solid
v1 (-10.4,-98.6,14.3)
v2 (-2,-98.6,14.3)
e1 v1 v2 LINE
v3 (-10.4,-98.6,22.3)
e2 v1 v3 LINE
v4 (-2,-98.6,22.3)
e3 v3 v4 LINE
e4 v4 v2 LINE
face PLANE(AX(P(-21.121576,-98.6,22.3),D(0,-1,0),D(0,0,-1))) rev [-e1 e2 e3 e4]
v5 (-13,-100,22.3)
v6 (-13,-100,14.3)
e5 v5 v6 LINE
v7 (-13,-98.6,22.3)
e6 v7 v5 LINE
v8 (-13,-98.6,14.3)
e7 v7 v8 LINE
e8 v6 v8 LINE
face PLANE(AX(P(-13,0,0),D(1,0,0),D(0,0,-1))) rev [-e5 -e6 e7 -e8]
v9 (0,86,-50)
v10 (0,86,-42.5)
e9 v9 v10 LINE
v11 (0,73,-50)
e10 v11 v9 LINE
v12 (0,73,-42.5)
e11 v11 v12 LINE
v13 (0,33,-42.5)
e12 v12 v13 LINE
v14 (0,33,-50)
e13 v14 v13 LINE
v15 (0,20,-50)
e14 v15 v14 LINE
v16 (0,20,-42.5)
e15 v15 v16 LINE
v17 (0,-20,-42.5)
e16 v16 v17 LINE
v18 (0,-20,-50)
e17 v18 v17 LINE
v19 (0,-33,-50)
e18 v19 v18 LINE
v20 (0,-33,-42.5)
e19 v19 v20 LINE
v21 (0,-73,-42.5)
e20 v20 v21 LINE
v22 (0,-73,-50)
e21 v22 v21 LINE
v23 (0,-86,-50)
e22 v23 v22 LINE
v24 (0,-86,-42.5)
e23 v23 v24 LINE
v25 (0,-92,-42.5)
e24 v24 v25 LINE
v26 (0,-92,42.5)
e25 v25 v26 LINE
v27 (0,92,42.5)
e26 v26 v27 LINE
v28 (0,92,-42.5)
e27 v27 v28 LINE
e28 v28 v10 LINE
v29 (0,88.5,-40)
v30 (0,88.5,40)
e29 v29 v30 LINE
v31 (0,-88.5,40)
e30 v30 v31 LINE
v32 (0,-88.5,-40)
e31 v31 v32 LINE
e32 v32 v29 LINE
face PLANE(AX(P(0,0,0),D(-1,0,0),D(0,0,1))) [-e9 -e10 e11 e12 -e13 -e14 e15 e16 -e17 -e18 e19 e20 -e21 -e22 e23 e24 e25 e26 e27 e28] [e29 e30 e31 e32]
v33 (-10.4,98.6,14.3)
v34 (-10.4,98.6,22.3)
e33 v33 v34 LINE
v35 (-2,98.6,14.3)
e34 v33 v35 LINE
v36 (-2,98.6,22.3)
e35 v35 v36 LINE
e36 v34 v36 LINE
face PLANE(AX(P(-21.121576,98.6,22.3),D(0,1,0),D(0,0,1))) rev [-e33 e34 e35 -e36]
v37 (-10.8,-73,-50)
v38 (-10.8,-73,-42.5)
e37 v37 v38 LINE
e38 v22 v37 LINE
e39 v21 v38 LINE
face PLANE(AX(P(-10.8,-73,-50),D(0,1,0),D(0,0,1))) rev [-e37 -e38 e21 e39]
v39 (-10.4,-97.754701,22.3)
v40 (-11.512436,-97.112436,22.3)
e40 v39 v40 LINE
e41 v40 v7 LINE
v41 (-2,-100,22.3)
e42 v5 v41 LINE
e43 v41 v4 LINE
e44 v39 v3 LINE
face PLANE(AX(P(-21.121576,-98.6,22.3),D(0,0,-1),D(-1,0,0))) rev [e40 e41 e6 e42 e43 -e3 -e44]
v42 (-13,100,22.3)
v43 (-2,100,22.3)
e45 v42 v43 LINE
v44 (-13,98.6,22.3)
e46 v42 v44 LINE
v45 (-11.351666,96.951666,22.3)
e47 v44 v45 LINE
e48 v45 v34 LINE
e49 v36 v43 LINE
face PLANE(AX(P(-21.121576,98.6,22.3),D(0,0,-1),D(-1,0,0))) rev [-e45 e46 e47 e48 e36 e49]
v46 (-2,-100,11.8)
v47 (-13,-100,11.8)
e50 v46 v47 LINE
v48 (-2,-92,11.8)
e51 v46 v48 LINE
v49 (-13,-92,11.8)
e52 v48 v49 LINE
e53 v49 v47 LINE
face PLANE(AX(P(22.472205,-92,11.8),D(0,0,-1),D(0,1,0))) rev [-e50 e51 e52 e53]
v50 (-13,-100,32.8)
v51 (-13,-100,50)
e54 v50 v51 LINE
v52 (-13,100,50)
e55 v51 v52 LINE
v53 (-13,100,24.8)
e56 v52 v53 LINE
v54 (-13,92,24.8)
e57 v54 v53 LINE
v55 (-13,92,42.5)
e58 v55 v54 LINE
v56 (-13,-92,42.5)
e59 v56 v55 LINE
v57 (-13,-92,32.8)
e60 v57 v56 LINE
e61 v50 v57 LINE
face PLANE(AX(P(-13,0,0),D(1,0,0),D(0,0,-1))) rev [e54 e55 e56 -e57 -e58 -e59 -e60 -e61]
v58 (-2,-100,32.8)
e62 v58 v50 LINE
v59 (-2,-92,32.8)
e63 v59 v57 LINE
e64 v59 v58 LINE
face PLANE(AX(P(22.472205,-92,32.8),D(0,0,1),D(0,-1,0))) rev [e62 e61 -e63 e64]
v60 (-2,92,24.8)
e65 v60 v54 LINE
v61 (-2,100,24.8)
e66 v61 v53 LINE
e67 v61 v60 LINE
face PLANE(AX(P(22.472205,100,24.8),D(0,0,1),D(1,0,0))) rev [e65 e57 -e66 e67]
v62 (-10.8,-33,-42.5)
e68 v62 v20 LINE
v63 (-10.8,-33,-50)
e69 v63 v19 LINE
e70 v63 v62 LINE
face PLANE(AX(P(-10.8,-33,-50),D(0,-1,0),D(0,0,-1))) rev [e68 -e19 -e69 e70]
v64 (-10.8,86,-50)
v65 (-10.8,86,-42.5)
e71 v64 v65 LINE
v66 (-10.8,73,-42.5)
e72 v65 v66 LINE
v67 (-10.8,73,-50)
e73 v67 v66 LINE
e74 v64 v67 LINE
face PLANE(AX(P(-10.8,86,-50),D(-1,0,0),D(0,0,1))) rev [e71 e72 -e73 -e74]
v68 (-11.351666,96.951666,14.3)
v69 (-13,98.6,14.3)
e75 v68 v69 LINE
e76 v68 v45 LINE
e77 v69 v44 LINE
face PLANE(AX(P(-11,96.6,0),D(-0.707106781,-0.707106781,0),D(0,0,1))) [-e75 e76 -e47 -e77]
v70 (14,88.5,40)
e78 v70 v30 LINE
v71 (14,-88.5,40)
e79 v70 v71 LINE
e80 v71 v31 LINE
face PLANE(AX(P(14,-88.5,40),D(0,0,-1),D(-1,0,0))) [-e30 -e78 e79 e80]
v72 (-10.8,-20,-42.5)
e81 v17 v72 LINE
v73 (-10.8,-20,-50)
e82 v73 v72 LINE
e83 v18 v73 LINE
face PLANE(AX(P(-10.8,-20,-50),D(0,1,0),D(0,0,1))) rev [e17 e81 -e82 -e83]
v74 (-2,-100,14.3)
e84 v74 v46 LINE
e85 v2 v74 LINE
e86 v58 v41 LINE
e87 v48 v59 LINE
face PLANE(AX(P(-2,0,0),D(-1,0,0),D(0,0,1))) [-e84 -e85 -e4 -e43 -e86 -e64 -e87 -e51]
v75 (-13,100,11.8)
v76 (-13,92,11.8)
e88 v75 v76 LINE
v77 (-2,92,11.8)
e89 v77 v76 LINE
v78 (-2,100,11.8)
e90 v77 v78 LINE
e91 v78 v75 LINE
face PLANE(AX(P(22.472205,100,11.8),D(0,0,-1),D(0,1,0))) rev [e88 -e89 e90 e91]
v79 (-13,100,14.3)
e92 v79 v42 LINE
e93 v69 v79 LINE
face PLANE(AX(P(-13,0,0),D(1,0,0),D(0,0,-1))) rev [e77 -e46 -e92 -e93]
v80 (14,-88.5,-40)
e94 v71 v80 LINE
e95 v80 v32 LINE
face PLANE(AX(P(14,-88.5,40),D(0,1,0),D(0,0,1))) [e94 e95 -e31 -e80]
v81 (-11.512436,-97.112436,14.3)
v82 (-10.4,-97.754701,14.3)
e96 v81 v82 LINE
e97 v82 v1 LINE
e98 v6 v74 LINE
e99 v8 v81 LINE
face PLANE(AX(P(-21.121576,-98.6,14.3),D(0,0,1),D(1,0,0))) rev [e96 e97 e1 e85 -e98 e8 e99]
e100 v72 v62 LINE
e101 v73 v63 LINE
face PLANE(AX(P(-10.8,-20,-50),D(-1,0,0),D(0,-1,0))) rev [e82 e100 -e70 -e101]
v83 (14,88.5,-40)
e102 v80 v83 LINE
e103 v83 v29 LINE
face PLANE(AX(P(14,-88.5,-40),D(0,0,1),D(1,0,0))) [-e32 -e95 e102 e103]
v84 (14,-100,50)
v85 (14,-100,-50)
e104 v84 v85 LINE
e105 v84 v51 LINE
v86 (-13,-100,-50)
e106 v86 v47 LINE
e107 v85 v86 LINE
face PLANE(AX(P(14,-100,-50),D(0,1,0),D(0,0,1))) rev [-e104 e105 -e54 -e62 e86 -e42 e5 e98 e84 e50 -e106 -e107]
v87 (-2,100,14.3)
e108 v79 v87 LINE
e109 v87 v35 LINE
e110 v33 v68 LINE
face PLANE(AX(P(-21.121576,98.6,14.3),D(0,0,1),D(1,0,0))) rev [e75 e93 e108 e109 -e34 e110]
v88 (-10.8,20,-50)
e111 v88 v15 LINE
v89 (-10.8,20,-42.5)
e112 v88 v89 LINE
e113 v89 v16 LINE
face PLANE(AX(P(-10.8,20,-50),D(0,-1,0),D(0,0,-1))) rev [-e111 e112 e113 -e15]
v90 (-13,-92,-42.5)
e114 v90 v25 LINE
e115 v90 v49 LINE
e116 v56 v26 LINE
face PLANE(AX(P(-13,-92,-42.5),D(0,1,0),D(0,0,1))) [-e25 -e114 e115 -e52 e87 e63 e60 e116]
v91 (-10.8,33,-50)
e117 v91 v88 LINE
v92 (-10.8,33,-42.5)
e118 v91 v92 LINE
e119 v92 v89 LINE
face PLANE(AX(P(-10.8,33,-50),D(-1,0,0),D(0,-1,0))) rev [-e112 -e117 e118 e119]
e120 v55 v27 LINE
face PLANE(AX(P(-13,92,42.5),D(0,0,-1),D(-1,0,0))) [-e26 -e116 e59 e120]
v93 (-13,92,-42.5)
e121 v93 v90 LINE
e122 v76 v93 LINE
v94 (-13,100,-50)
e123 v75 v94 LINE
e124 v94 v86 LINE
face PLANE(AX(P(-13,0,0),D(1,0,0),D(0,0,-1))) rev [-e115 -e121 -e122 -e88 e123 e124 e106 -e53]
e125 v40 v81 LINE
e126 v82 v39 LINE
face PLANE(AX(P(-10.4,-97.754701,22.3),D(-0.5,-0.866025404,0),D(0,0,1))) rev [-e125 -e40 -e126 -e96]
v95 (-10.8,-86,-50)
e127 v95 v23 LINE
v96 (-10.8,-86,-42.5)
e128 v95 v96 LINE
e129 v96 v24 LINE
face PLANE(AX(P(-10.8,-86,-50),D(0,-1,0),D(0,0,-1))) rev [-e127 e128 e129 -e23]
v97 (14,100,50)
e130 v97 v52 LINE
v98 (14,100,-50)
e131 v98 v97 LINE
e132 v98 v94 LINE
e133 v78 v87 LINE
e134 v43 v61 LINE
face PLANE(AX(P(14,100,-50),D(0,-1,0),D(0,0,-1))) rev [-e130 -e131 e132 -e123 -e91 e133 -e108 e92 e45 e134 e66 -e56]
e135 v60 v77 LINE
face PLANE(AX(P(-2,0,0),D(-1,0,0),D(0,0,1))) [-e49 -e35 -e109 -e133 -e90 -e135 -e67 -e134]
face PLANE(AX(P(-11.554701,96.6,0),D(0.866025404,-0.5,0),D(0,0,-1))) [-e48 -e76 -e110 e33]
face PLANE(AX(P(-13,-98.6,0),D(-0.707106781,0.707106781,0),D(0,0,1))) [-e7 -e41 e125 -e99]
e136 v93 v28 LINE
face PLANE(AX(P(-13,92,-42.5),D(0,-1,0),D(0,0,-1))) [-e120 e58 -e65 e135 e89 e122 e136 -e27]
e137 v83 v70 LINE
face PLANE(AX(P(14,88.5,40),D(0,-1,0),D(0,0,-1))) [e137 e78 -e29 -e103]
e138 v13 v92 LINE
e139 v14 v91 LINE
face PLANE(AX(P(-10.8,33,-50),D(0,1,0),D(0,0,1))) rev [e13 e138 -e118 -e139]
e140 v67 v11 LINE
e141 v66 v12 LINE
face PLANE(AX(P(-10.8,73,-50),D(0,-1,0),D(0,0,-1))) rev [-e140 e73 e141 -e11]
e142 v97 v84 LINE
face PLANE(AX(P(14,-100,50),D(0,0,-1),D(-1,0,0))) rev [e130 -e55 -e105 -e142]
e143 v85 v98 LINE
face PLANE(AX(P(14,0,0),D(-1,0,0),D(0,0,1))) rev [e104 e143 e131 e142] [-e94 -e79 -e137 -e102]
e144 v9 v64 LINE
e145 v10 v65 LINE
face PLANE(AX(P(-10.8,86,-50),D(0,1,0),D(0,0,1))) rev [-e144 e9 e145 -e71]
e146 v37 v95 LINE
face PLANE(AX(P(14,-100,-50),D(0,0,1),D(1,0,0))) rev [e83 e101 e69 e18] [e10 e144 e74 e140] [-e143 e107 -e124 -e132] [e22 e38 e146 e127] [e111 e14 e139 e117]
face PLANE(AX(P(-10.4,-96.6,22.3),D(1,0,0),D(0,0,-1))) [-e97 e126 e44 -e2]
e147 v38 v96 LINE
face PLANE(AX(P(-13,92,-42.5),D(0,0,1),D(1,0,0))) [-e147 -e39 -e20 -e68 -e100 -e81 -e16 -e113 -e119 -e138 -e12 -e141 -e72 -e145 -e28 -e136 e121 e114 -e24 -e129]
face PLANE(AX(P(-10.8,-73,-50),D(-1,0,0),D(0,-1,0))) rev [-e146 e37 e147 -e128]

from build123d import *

# Parameters (mm, degrees)
SKETCH1_W           = 200
SKETCH1_H           = 100
SKETCH1_W_2         = 177
SKETCH1_H_2         = 80
BOSS_EXTRUDE1_DEPTH = 14
SKETCH2_W           = 200
SKETCH2_H           = 100
SKETCH2_W_2         = 184
SKETCH2_H_2         = 85
BOSS_EXTRUDE2_DEPTH = 13
SKETCH4_W           = 10.8
SKETCH4_H           = 13
CUT_EXTRUDE2_DEPTH  = 137.938854968
SKETCH5_W           = 8
SKETCH5_H           = 13
SKETCH5_H_2         = 21
CUT_EXTRUDE3_DEPTH  = 11
SKETCH7_W           = 1.4
SKETCH7_H           = 8
BOSS_EXTRUDE3_DEPTH = 11
SKETCH8_W           = 2.6
SKETCH8_H           = 8
BOSS_EXTRUDE4_DEPTH = 2
CHAMFER3_SIZE       = 2
CHAMFER4_SIZE       = 1.154700538
CHAMFER4_SIZE_2     = 2
MIRROR2_START       = 14.3
MIRROR2_DEPTH       = 8


# Read off the part's stored shape, not the designer's step: Mirror2
with BuildPart() as part:
    # Sketch1 → Boss-Extrude1 (new body)
    with BuildSketch(Plane.YZ):
        Rectangle(SKETCH1_W, SKETCH1_H)
        Rectangle(SKETCH1_W_2, SKETCH1_H_2, mode=Mode.SUBTRACT)
    extrude(amount=BOSS_EXTRUDE1_DEPTH)

    # Sketch2 → Boss-Extrude2 (add)
    with BuildSketch(Plane(origin=(0, 0, 0), x_dir=(0, -1, 0), z_dir=(-1, 0, 0))):
        Rectangle(SKETCH2_W, SKETCH2_H)
        Rectangle(SKETCH2_W_2, SKETCH2_H_2, mode=Mode.SUBTRACT)
    extrude(amount=BOSS_EXTRUDE2_DEPTH)

    # Sketch4 → Cut-Extrude2 (cut, through all)
    with BuildSketch(Plane.XY.offset(-42.5)):
        with Locations((-5.4, 79.5)):
            Rectangle(SKETCH4_W, SKETCH4_H)
        with Locations((-5.4, 26.5)):
            Rectangle(SKETCH4_W, SKETCH4_H)
        with Locations((-5.4, -26.5)):
            Rectangle(SKETCH4_W, SKETCH4_H)
        with Locations((-5.4, -79.5)):
            Rectangle(SKETCH4_W, SKETCH4_H)
    extrude(amount=-CUT_EXTRUDE2_DEPTH, mode=Mode.SUBTRACT)

    # Sketch5 → Cut-Extrude3 (cut)
    with BuildSketch(Plane(origin=(-13, 0, 0), x_dir=(0, -1, 0), z_dir=(-1, 0, 0))):
        with Locations((-96, 18.3)):
            Rectangle(SKETCH5_W, SKETCH5_H)
        with Locations((96, 22.3)):
            Rectangle(SKETCH5_W, SKETCH5_H_2)
    extrude(amount=-CUT_EXTRUDE3_DEPTH, mode=Mode.SUBTRACT)

    # Sketch7 → Boss-Extrude3 (add)
    with BuildSketch(Plane(origin=(-2, 0, 0), x_dir=(0, -1, 0), z_dir=(-1, 0, 0))):
        with Locations((-99.3, 18.3)):
            Rectangle(SKETCH7_W, SKETCH7_H)
        with Locations((99.3, 18.3)):
            Rectangle(SKETCH7_W, SKETCH7_H)
    extrude(amount=BOSS_EXTRUDE3_DEPTH)

    # Sketch8 → Boss-Extrude4 (add)
    with BuildSketch(Plane.XZ.offset(-98.6)):
        with Locations((-11.7, 18.3)):
            Rectangle(SKETCH8_W, SKETCH8_H)
    extrude(amount=BOSS_EXTRUDE4_DEPTH)

    # Chamfer3
    chamfer3_edges = [part.edges().sort_by_distance(p)[0] for p in [
        (-13, 96.6, 18.3),
    ]]
    chamfer(chamfer3_edges, length=CHAMFER3_SIZE)

    # Chamfer4
    # the kernel refuses this chamfer: 2, 1.154700538 mm, written as the material it takes off along each edge
    with BuildSketch(Plane(origin=(-10.4, 96.6, 27.474171509), x_dir=(-0.9983227437537927, -0.057893862402668146, 0), z_dir=(0, 0, -1))) as chamfer4_piece_1_section:
        Polygon((CHAMFER4_SIZE * 0.998322744082, CHAMFER4_SIZE * 0.0578938624217), (-CHAMFER4_SIZE_2 * 0.0578938624027, CHAMFER4_SIZE_2 * 0.998322743754), (0, 0), align=None)
    chamfer4_piece_1 = extrude(amount=18.348343019, mode=Mode.PRIVATE)
    chamfer4_piece_1 = split(chamfer4_piece_1, bisect_by=Plane(origin=(-10.737181007, 97.317358716, 24.8), z_dir=(0, 0, -1)), keep=Keep.TOP, mode=Mode.PRIVATE)
    chamfer4_piece_1 = split(chamfer4_piece_1, bisect_by=Plane(origin=(-10.737181007, 97.317358716, 11.8), z_dir=(0, 0, 1)), keep=Keep.TOP, mode=Mode.PRIVATE)
    add(chamfer4_piece_1, mode=Mode.SUBTRACT)

    # Mirror2 outline → Mirror2 (add)
    with BuildSketch(Plane.XY.offset(MIRROR2_START)):
        Polygon((-13, -98.6), (-10.4, -98.6), (-10.4, -97.754700538), (-11.512435565, -97.112435565), align=None)
    extrude(amount=MIRROR2_DEPTH)


solid = part.part
